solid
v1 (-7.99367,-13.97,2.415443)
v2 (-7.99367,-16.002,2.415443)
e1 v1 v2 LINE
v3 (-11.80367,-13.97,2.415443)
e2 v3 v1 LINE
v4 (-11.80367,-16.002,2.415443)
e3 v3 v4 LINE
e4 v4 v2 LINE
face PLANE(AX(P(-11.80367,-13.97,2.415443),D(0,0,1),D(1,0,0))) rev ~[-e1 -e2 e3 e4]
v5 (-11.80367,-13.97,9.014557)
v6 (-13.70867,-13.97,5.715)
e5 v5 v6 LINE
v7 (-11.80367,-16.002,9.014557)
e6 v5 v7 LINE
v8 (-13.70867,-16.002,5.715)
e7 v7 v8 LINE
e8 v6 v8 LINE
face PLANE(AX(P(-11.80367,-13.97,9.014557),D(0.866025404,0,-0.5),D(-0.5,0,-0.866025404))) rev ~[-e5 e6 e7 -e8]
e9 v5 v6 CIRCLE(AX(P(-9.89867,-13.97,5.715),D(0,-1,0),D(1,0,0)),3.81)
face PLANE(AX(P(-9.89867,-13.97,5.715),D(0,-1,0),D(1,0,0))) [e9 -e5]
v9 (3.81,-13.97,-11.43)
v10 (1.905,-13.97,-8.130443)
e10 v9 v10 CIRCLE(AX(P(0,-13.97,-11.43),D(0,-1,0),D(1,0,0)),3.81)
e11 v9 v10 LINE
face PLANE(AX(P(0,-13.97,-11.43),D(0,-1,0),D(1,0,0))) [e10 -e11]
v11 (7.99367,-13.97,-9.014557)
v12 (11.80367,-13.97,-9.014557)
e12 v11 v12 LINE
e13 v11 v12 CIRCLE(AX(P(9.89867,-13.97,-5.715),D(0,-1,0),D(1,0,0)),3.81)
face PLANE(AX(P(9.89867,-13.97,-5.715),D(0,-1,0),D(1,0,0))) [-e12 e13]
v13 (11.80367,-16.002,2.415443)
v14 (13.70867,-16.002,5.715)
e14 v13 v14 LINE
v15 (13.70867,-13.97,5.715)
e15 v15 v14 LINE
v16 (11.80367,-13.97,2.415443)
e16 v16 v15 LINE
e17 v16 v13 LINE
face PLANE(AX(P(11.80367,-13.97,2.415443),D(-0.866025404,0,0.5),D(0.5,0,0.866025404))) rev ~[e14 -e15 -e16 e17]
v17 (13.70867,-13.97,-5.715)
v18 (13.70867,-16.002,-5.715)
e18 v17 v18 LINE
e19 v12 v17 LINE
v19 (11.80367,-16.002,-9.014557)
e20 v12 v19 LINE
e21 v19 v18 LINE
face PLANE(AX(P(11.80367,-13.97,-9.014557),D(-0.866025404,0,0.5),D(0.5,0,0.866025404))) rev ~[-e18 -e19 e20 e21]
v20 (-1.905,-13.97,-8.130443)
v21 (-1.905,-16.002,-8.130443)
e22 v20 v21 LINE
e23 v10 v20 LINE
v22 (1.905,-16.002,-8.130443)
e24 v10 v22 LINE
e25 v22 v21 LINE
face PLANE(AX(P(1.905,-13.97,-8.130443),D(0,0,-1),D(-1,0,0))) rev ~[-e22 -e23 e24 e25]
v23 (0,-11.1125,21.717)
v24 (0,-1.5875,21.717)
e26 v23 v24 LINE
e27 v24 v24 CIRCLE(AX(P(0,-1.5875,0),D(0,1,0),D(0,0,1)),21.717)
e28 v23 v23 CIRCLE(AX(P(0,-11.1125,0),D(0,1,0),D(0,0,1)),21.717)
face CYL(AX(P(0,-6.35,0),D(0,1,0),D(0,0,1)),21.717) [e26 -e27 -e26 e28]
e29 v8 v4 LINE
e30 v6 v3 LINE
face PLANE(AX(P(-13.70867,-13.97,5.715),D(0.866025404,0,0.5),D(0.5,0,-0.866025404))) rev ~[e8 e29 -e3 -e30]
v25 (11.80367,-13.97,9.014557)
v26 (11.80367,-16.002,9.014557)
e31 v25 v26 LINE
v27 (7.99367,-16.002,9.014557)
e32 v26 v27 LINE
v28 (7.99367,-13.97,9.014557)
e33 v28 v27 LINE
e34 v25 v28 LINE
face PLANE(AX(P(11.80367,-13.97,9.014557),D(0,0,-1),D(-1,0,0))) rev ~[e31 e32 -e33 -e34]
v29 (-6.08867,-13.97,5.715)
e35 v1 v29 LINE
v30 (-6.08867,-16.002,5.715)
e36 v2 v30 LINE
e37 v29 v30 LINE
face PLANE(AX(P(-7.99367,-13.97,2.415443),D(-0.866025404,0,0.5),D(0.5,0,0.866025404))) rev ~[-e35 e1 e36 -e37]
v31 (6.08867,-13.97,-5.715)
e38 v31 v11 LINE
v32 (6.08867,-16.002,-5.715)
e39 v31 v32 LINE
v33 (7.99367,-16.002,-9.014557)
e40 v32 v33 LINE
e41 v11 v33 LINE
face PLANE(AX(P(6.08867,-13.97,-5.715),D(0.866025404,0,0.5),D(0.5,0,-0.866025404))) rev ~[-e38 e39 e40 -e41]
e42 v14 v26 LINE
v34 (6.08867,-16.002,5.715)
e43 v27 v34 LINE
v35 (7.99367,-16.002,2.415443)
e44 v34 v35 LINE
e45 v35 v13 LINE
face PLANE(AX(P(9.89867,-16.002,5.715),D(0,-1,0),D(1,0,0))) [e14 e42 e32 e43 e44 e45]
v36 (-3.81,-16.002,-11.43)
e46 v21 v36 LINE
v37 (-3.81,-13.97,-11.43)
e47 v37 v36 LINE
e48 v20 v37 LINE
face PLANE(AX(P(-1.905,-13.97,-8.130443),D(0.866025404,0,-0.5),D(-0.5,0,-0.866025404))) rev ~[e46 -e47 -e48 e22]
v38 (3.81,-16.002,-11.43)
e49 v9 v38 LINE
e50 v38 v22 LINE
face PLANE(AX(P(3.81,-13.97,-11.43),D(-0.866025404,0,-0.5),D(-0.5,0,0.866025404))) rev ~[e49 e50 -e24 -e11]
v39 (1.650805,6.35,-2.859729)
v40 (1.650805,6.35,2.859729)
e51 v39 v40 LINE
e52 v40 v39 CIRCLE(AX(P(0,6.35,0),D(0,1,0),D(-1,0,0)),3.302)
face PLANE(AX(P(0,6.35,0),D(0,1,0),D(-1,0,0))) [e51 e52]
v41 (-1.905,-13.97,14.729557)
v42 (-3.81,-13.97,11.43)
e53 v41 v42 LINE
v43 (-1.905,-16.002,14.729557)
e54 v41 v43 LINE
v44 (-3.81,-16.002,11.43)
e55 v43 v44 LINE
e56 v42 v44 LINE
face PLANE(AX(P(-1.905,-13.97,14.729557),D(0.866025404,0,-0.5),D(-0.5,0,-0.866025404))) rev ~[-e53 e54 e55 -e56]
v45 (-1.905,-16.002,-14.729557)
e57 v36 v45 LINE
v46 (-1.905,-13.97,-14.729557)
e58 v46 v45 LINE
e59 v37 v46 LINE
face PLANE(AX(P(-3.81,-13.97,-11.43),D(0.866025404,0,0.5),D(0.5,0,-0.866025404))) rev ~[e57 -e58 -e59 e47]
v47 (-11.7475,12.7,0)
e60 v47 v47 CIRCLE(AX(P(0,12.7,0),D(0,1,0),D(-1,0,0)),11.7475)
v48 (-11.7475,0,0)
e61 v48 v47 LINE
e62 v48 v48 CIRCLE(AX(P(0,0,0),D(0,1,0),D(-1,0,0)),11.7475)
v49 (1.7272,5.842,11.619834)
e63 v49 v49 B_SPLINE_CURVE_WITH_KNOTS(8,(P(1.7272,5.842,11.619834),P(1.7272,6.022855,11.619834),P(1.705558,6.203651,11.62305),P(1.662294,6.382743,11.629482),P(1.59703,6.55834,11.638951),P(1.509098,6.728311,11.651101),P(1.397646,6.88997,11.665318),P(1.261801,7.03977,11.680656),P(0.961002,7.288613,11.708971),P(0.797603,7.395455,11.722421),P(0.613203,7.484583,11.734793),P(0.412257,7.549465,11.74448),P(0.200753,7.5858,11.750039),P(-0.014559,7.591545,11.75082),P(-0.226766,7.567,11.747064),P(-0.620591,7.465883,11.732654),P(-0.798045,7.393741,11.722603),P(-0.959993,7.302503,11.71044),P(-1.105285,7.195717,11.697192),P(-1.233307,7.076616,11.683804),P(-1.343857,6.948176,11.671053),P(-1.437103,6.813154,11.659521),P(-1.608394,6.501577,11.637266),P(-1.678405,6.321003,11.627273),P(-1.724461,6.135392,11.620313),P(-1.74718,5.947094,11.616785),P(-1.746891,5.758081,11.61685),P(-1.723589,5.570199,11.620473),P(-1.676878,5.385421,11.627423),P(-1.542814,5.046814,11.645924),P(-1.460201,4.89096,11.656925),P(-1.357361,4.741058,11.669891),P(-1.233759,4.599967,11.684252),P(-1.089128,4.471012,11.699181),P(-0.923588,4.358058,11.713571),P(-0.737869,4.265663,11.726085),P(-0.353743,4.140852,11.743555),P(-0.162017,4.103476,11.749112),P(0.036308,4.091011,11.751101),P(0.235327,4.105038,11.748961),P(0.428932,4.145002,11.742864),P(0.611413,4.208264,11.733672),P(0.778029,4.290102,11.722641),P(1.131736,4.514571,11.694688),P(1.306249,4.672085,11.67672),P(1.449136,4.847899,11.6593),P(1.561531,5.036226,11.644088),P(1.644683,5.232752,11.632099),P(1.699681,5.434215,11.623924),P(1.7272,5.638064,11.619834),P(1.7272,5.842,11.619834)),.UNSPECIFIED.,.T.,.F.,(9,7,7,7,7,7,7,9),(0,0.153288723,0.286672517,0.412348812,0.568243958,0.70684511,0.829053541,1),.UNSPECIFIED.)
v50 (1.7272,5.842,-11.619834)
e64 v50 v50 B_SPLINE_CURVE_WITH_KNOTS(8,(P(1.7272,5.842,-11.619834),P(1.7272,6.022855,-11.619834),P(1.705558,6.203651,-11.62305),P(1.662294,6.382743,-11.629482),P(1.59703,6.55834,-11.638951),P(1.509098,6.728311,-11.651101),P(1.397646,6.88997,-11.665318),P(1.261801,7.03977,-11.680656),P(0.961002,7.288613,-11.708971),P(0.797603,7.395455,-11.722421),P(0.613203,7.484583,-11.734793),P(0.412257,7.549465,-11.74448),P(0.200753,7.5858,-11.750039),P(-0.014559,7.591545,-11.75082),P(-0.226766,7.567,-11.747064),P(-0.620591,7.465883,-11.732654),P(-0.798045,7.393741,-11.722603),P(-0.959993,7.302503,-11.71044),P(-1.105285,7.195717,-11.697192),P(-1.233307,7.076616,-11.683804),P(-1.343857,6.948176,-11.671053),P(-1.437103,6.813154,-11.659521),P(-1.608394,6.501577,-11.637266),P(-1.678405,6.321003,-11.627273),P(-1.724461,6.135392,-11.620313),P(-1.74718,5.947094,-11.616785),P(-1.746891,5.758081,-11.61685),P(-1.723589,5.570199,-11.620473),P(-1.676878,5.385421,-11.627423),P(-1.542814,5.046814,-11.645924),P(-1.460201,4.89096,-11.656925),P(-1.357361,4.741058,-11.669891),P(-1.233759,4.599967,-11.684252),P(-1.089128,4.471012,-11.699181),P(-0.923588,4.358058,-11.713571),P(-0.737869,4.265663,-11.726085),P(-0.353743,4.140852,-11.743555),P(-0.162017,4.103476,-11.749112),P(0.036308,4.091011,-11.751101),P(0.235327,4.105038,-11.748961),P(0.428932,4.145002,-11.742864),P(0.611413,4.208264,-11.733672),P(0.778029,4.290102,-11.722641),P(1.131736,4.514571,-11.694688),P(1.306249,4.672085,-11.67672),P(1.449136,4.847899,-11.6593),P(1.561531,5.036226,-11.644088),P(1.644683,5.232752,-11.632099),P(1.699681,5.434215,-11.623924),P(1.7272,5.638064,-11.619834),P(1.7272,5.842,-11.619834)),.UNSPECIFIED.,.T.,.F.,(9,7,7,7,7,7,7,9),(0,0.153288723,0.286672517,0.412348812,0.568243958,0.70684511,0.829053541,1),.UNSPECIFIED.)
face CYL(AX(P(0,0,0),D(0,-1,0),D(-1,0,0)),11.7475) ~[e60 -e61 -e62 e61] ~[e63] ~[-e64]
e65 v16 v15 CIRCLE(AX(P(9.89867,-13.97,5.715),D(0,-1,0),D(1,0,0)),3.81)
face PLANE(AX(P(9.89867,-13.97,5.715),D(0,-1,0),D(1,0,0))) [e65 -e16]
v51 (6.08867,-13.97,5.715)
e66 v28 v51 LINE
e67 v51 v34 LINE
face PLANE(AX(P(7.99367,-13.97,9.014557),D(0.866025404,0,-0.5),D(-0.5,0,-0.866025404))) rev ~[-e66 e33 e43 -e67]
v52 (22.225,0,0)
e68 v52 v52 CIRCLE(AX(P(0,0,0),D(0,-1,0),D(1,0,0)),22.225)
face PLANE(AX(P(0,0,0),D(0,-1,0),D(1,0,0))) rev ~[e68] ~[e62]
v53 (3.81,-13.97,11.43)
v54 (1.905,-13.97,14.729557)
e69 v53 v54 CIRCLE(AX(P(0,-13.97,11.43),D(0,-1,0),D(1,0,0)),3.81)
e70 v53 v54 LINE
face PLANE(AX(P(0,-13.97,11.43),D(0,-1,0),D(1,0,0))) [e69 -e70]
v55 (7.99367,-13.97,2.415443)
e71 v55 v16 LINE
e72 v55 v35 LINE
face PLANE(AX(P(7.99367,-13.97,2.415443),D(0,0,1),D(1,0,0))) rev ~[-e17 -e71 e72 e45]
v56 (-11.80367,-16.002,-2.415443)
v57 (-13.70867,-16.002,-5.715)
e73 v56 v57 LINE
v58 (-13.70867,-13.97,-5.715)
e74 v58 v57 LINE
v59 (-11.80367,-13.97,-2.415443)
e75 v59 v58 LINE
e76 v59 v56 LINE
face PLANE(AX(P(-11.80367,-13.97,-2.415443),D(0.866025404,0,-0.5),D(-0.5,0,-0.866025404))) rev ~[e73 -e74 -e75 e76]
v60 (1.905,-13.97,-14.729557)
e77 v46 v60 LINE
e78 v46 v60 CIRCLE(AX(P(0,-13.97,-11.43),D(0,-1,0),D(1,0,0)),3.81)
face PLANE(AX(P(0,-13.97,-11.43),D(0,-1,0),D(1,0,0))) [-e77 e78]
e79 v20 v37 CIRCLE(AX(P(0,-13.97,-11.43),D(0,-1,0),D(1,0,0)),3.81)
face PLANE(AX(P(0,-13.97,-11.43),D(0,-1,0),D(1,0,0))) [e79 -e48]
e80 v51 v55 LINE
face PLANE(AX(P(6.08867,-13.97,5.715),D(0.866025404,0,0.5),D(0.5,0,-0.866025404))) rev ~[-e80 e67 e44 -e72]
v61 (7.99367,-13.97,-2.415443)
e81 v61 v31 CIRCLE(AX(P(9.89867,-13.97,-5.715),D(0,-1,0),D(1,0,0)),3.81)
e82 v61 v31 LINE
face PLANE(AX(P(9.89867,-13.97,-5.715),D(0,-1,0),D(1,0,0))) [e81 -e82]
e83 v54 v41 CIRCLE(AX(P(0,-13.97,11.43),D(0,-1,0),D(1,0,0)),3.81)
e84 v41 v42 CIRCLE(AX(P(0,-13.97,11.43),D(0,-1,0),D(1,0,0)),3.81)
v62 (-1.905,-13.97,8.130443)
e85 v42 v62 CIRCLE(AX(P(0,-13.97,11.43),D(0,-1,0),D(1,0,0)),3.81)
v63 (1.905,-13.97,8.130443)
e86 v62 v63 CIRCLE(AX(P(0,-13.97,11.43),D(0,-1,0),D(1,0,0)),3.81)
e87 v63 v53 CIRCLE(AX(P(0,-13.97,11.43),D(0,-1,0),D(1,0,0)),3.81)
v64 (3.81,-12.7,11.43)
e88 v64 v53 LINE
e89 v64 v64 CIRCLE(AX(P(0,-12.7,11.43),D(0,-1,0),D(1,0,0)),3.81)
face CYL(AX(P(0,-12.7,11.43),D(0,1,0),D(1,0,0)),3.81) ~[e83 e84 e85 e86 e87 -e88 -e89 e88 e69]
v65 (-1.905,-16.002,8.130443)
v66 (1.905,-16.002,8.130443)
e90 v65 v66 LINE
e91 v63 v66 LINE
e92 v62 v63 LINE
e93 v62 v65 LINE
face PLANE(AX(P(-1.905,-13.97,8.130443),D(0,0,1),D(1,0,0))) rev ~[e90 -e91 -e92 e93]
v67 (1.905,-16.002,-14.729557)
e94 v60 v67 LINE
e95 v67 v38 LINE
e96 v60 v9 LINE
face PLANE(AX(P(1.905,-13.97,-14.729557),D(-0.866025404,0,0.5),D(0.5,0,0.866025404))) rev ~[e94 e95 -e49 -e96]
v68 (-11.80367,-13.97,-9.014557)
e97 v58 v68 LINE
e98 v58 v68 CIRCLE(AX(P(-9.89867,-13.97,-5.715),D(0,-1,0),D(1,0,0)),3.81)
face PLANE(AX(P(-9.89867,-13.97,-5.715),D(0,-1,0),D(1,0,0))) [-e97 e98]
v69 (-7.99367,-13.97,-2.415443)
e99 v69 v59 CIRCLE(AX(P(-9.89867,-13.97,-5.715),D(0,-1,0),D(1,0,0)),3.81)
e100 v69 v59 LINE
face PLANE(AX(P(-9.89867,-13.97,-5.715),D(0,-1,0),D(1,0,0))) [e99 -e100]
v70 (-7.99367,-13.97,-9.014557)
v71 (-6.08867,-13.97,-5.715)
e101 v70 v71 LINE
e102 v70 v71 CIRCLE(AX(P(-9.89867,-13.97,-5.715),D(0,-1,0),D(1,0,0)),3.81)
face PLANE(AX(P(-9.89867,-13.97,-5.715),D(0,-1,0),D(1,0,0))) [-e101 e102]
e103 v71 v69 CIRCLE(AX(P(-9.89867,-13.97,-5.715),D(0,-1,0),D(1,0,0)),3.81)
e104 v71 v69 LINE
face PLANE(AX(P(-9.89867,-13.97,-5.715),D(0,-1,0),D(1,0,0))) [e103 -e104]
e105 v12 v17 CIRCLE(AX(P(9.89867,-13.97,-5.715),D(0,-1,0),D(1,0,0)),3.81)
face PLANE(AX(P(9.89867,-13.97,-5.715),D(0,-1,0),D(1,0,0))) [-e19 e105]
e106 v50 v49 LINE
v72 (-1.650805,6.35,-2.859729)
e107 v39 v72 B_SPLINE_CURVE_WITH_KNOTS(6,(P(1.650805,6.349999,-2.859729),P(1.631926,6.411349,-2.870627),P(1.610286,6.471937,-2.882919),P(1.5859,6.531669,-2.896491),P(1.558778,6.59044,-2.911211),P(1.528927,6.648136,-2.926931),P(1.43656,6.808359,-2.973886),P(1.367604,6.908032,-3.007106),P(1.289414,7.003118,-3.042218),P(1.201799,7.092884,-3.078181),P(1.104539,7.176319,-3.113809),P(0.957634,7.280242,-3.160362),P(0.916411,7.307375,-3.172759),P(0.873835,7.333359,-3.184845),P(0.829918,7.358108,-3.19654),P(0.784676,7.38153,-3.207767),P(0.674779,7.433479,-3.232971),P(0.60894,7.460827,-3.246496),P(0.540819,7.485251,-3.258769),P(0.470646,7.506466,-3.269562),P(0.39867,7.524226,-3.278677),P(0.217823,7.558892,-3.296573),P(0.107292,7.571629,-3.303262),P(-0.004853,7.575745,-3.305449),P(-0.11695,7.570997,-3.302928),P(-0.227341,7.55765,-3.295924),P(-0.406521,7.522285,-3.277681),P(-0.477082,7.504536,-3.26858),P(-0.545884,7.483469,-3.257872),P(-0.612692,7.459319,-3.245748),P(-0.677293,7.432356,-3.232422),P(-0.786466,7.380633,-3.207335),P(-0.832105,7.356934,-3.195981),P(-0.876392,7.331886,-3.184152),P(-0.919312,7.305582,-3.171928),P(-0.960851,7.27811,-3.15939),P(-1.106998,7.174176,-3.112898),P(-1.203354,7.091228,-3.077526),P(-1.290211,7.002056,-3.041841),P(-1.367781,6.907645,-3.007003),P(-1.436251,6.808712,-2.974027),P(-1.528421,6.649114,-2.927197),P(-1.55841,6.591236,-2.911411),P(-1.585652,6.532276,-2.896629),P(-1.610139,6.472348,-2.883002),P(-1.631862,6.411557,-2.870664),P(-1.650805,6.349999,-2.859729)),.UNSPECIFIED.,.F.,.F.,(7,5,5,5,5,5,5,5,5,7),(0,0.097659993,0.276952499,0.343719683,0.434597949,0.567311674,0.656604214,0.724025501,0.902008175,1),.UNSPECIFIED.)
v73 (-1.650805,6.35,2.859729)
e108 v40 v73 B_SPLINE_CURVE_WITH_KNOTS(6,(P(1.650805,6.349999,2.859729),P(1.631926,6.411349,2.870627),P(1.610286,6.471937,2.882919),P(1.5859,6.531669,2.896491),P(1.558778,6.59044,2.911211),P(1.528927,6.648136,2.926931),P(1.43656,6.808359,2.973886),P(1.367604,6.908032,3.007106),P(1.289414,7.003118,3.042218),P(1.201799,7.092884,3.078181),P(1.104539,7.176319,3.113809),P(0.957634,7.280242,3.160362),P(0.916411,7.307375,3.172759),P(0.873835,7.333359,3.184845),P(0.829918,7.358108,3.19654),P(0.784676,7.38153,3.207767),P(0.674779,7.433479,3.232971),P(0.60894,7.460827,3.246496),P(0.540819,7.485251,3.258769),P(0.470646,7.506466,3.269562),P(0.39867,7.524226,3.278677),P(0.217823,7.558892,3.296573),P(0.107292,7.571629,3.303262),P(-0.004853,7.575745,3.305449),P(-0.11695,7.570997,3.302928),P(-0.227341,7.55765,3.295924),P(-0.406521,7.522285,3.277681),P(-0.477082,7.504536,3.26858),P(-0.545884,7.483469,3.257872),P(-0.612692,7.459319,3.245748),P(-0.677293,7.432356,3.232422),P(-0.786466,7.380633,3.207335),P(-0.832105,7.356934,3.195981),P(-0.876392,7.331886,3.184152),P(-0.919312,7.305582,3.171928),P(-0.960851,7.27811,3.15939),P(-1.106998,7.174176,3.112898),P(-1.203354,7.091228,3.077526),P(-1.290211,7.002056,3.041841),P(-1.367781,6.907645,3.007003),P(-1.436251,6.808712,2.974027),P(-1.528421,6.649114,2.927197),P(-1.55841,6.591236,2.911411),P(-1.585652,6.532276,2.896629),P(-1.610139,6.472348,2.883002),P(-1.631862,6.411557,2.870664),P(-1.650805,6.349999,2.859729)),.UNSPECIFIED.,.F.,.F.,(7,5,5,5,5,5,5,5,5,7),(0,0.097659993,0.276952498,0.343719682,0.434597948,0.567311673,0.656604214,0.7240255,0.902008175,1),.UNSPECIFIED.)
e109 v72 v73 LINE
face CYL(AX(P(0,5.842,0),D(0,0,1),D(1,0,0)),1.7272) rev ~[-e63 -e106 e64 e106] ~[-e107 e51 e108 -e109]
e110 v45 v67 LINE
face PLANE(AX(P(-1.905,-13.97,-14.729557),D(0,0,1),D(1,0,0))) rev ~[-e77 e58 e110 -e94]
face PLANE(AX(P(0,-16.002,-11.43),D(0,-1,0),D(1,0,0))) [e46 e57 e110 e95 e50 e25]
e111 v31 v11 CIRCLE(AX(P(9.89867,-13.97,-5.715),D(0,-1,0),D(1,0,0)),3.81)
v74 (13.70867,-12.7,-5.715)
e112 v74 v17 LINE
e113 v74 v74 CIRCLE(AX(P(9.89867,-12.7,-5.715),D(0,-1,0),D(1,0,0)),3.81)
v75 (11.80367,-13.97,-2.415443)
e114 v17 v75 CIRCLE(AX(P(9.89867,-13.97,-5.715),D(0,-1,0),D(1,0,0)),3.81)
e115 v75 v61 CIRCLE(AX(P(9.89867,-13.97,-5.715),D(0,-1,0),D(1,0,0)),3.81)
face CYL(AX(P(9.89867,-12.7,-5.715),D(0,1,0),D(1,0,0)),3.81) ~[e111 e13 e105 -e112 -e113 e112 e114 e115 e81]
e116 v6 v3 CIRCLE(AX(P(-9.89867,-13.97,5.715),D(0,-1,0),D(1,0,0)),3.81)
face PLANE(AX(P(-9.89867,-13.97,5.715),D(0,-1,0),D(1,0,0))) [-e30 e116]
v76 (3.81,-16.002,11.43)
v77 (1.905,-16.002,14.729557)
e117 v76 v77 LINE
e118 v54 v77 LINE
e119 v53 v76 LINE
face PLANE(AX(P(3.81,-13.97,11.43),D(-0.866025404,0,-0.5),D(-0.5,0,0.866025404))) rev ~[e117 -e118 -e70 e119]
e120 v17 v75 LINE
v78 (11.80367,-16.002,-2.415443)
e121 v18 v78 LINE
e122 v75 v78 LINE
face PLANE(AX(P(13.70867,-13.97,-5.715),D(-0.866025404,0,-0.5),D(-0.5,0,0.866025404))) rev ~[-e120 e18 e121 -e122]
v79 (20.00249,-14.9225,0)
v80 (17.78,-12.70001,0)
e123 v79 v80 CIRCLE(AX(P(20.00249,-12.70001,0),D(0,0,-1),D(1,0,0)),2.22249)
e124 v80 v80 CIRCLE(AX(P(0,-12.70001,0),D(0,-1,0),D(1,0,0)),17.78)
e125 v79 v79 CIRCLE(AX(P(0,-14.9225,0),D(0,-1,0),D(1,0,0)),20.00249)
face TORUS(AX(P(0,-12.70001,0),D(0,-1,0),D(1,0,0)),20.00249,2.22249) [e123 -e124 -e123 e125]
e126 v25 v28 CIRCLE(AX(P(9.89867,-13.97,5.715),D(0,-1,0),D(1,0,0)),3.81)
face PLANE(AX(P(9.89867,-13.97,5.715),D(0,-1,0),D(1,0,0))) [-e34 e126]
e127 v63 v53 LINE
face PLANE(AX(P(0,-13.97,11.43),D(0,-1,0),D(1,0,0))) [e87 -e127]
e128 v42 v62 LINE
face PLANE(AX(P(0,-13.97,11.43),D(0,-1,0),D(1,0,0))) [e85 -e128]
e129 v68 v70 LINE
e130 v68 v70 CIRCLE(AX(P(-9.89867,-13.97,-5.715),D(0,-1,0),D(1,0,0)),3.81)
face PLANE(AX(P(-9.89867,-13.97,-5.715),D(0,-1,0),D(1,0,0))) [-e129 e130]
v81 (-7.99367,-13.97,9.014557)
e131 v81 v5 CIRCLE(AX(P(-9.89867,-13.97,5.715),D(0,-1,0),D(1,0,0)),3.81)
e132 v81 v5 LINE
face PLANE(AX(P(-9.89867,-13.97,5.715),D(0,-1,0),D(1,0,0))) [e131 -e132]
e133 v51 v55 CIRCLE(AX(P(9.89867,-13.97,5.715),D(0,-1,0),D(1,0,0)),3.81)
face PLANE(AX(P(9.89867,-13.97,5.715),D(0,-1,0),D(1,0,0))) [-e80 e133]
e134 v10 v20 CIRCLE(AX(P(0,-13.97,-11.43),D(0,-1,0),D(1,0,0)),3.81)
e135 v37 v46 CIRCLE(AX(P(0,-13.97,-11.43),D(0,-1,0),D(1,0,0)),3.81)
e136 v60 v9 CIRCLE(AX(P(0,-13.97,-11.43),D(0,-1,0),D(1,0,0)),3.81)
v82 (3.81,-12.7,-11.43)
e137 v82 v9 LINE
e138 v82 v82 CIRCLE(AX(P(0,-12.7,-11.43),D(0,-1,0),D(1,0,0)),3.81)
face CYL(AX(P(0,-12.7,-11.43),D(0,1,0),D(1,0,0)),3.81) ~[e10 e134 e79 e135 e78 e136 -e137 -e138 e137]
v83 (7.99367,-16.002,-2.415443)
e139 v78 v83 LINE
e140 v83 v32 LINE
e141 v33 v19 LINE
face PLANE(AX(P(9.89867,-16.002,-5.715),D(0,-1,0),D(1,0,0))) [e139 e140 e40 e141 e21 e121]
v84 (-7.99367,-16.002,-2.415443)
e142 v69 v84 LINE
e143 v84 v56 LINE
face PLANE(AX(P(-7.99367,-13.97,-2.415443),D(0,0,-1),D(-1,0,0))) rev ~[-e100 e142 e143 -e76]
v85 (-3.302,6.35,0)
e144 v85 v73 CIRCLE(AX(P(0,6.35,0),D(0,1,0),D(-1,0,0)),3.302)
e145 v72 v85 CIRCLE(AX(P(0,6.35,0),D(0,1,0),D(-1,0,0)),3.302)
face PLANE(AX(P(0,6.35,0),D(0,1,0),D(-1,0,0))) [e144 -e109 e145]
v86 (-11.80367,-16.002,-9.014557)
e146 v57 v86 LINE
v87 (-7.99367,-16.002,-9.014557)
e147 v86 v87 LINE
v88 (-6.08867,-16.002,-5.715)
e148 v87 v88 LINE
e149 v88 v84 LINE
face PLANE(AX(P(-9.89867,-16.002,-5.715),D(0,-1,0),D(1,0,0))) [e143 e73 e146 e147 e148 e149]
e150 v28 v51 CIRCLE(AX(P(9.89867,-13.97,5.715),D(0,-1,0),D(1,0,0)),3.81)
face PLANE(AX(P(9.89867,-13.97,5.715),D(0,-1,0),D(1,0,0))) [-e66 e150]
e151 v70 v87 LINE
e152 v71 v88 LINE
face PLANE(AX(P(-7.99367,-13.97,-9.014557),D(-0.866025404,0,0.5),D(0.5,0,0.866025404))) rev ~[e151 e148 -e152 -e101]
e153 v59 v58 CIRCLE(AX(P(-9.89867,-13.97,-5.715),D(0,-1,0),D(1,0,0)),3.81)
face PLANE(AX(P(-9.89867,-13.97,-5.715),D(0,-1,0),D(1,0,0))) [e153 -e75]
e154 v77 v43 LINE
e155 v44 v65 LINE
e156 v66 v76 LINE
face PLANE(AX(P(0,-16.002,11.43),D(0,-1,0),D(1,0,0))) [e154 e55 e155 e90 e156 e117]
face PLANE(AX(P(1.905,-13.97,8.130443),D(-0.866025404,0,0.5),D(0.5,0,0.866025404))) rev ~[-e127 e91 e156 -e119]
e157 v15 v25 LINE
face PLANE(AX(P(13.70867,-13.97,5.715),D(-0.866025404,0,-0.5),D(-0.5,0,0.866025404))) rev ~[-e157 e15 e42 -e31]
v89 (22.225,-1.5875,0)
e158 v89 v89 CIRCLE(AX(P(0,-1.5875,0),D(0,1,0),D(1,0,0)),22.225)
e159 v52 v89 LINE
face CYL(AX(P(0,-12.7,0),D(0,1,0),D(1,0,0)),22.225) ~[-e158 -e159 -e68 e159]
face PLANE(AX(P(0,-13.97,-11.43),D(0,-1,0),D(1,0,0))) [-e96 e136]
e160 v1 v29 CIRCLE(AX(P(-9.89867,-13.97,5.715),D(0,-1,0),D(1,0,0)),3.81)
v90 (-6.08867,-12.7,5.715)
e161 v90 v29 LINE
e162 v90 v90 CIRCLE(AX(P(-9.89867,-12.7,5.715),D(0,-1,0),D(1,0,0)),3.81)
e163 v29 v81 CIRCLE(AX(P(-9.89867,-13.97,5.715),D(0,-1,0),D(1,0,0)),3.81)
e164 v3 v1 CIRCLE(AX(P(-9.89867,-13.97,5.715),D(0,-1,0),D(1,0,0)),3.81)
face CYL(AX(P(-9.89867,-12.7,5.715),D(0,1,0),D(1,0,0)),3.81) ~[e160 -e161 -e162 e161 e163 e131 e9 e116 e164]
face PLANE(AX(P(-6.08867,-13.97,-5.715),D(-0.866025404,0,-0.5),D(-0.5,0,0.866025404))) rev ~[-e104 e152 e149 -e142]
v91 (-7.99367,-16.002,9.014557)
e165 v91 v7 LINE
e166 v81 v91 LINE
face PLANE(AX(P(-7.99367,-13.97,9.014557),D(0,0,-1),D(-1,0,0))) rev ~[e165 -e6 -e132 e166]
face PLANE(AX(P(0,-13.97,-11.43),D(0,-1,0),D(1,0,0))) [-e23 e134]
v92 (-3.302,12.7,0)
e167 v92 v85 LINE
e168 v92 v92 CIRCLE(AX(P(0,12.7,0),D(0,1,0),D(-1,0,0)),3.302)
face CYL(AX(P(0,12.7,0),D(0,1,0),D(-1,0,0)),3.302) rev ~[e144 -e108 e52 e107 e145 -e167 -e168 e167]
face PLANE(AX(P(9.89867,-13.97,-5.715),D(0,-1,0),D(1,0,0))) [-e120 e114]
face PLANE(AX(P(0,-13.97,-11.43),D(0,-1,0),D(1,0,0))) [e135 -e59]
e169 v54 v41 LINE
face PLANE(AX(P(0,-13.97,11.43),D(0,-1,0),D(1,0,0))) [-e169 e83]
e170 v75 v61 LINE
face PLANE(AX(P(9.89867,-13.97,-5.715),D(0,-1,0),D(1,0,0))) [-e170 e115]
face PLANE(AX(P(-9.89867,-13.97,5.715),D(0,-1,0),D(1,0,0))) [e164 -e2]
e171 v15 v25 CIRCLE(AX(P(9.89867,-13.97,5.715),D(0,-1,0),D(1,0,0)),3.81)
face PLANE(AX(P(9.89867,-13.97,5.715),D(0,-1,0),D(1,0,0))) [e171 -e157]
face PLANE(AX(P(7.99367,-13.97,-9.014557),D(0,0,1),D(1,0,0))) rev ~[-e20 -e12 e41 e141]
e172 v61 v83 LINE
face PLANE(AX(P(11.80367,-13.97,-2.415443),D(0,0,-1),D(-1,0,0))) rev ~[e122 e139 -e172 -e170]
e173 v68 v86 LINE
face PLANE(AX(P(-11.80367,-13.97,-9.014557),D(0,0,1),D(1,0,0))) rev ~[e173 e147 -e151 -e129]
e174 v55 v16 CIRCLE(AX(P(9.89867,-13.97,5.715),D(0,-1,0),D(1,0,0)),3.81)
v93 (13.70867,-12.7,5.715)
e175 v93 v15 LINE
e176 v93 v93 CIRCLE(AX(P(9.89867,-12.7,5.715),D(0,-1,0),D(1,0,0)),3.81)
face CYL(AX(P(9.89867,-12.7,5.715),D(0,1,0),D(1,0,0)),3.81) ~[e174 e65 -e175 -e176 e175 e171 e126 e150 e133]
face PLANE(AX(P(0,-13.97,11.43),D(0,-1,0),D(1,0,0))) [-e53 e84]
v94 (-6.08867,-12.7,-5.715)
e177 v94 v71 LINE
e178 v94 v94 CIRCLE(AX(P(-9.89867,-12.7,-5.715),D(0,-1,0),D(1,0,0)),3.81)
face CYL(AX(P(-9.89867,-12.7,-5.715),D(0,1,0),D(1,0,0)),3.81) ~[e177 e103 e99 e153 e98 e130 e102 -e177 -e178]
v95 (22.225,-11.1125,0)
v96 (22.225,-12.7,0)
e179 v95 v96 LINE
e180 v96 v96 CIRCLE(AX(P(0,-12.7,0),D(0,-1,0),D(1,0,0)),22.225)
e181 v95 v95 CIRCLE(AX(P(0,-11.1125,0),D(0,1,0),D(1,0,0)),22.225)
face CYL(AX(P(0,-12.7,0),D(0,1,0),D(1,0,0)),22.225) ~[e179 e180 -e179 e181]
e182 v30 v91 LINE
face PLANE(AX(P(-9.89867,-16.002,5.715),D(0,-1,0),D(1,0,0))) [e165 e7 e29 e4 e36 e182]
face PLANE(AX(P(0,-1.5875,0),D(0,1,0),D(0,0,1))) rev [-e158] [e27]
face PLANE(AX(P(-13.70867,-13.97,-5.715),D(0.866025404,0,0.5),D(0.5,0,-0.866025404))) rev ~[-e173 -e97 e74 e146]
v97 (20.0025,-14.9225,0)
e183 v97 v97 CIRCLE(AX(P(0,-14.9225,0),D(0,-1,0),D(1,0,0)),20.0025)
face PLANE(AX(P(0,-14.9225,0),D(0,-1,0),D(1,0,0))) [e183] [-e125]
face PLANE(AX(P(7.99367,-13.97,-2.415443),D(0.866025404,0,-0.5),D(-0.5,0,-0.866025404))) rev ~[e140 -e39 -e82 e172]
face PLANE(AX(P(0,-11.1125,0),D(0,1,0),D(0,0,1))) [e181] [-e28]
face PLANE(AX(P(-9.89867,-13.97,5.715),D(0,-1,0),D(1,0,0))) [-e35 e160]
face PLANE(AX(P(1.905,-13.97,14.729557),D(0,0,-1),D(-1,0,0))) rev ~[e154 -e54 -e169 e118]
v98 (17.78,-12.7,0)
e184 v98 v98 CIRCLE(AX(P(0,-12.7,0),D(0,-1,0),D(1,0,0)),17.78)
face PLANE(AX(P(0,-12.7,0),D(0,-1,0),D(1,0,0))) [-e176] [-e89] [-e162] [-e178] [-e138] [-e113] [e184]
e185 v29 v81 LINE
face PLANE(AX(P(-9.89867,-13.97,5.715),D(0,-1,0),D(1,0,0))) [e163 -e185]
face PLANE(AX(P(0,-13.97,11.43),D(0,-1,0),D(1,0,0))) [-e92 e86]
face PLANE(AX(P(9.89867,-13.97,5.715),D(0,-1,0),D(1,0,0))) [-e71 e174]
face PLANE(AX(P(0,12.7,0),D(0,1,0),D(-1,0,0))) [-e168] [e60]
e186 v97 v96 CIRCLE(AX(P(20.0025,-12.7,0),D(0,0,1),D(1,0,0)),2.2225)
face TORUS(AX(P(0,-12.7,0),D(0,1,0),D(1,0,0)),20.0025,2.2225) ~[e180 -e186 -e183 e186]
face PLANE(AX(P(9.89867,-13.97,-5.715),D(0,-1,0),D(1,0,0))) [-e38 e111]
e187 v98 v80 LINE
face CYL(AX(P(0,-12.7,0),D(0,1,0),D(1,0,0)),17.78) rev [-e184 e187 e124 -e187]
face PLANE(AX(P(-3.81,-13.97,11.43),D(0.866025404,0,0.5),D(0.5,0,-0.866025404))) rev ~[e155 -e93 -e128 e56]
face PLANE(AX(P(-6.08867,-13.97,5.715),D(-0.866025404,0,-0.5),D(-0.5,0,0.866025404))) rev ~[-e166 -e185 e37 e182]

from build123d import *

# Parameters (mm, degrees)
F0_R      = 22.225
F1_DEPTH  = 12.7
F2_R      = 3.81
F3_DEPTH  = 1.27
F5_DEPTH  = 2.032
F6_R      = 22.225
F6_R_2    = 17.78
F7_DEPTH  = 2.2225
F8_R      = 2.22249
F9_R      = 2.2225
F10_R     = 11.7475
F11_DEPTH = 12.7
F12_R     = 3.302
F13_DEPTH = 6.35
F14_R     = 1.7272
F15_DEPTH = 63.5
F16_W     = 9.525
F16_H     = 0.508


# Not quite as in the source:
# - a fillet or chamfer is up to 0.001 mm smaller than in the source, because OpenCascade refuses the exact size


with BuildPart() as f1:
    # F0 (on Front) → F1 (new body)
    with BuildSketch(Plane.XZ):
        Circle(F0_R)
    extrude(amount=F1_DEPTH)

    # F2 (on face) → F3 (join)
    with BuildSketch(Plane.XZ.offset(12.7)):
        with Locations((0, 11.43)):
            Circle(F2_R)
        with Locations((-9.8986703653, 5.715)):
            Circle(F2_R)
        with Locations((-9.8986703653, -5.715)):
            Circle(F2_R)
        with Locations((0, -11.43)):
            Circle(F2_R)
        with Locations((9.8986703653, -5.715)):
            Circle(F2_R)
        with Locations((9.8986703653, 5.715)):
            Circle(F2_R)
    extrude(amount=F3_DEPTH)

    # F4 (on face) → F5 (join)
    with BuildSketch(Plane.XZ.offset(13.97)):
        Polygon((1.905, 8.1304432116), (3.81, 11.43), (1.905, 14.7295567884), (-1.905, 14.7295567884), (-3.81, 11.43), (-1.905, 8.1304432116), align=None)
        Polygon((-7.9936703653, 2.4154432116), (-6.0886703653, 5.715), (-7.9936703653, 9.0145567884), (-11.8036703653, 9.0145567884), (-13.7086703653, 5.715), (-11.8036703653, 2.4154432116), align=None)
        Polygon((7.9936703653, 9.0145567884), (6.0886703653, 5.715), (7.9936703653, 2.4154432116), (11.8036703653, 2.4154432116), (13.7086703653, 5.715), (11.8036703653, 9.0145567884), align=None)
        Polygon((-7.9936703653, -2.4154432116), (-11.8036703653, -2.4154432116), (-13.7086703653, -5.715), (-11.8036703653, -9.0145567884), (-7.9936703653, -9.0145567884), (-6.0886703653, -5.715), align=None)
        Polygon((3.81, -11.43), (1.905, -8.1304432116), (-1.905, -8.1304432116), (-3.81, -11.43), (-1.905, -14.7295567884), (1.905, -14.7295567884), align=None)
        Polygon((7.9936703653, -2.4154432116), (6.0886703653, -5.715), (7.9936703653, -9.0145567884), (11.8036703653, -9.0145567884), (13.7086703653, -5.715), (11.8036703653, -2.4154432116), align=None)
    extrude(amount=F5_DEPTH)

    # F6 (on face) → F7 (join)
    with BuildSketch(Plane.XZ.offset(12.7)):
        Circle(F6_R)
        Circle(F6_R_2, mode=Mode.SUBTRACT)
    extrude(amount=F7_DEPTH)

    # F8 (radius 2.2225 in the source; OpenCascade refuses exactly that, so slightly less here)
    f8_edges = [f1.edges().sort_by_distance(p)[0] for p in [
        (-17.78, -14.9225, 0),
    ]]
    fillet(f8_edges, radius=F8_R)

    # F9
    f9_edges = [f1.edges().sort_by_distance(p)[0] for p in [
        (-22.225, -14.9225, 0),
    ]]
    fillet(f9_edges, radius=F9_R)

    # F10 (on face) → F11 (join)
    with BuildSketch(Plane(origin=(0, 0, 0), x_dir=(-1, 0, 0), z_dir=(0, 1, 0))):
        Circle(F10_R)
    extrude(amount=F11_DEPTH)

    # F12 (on face) → F13 (cut)
    with BuildSketch(Plane(origin=(0, 12.7, 0), x_dir=(-1, 0, 0), z_dir=(0, 1, 0))):
        Circle(F12_R)
    extrude(amount=-F13_DEPTH, mode=Mode.SUBTRACT)

    # F14 (on Top) → F15 (cut, symmetric)
    with BuildSketch(Plane.XY):
        with Locations((0, 5.842)):
            Circle(F14_R)
    extrude(amount=F15_DEPTH, both=True, mode=Mode.SUBTRACT)

    # F16 (on Right) → F18 (revolve, cut)
    with BuildSketch(Plane.YZ):
        with Locations((-6.35, 22.479)):
            Rectangle(F16_W, F16_H)
        with Locations((-6.35, 21.971)):
            Rectangle(F16_W, F16_H)
    revolve(axis=Axis((0, 11.6996625438, 0), (0, 1, 0)), mode=Mode.SUBTRACT)


solid = f1.part
